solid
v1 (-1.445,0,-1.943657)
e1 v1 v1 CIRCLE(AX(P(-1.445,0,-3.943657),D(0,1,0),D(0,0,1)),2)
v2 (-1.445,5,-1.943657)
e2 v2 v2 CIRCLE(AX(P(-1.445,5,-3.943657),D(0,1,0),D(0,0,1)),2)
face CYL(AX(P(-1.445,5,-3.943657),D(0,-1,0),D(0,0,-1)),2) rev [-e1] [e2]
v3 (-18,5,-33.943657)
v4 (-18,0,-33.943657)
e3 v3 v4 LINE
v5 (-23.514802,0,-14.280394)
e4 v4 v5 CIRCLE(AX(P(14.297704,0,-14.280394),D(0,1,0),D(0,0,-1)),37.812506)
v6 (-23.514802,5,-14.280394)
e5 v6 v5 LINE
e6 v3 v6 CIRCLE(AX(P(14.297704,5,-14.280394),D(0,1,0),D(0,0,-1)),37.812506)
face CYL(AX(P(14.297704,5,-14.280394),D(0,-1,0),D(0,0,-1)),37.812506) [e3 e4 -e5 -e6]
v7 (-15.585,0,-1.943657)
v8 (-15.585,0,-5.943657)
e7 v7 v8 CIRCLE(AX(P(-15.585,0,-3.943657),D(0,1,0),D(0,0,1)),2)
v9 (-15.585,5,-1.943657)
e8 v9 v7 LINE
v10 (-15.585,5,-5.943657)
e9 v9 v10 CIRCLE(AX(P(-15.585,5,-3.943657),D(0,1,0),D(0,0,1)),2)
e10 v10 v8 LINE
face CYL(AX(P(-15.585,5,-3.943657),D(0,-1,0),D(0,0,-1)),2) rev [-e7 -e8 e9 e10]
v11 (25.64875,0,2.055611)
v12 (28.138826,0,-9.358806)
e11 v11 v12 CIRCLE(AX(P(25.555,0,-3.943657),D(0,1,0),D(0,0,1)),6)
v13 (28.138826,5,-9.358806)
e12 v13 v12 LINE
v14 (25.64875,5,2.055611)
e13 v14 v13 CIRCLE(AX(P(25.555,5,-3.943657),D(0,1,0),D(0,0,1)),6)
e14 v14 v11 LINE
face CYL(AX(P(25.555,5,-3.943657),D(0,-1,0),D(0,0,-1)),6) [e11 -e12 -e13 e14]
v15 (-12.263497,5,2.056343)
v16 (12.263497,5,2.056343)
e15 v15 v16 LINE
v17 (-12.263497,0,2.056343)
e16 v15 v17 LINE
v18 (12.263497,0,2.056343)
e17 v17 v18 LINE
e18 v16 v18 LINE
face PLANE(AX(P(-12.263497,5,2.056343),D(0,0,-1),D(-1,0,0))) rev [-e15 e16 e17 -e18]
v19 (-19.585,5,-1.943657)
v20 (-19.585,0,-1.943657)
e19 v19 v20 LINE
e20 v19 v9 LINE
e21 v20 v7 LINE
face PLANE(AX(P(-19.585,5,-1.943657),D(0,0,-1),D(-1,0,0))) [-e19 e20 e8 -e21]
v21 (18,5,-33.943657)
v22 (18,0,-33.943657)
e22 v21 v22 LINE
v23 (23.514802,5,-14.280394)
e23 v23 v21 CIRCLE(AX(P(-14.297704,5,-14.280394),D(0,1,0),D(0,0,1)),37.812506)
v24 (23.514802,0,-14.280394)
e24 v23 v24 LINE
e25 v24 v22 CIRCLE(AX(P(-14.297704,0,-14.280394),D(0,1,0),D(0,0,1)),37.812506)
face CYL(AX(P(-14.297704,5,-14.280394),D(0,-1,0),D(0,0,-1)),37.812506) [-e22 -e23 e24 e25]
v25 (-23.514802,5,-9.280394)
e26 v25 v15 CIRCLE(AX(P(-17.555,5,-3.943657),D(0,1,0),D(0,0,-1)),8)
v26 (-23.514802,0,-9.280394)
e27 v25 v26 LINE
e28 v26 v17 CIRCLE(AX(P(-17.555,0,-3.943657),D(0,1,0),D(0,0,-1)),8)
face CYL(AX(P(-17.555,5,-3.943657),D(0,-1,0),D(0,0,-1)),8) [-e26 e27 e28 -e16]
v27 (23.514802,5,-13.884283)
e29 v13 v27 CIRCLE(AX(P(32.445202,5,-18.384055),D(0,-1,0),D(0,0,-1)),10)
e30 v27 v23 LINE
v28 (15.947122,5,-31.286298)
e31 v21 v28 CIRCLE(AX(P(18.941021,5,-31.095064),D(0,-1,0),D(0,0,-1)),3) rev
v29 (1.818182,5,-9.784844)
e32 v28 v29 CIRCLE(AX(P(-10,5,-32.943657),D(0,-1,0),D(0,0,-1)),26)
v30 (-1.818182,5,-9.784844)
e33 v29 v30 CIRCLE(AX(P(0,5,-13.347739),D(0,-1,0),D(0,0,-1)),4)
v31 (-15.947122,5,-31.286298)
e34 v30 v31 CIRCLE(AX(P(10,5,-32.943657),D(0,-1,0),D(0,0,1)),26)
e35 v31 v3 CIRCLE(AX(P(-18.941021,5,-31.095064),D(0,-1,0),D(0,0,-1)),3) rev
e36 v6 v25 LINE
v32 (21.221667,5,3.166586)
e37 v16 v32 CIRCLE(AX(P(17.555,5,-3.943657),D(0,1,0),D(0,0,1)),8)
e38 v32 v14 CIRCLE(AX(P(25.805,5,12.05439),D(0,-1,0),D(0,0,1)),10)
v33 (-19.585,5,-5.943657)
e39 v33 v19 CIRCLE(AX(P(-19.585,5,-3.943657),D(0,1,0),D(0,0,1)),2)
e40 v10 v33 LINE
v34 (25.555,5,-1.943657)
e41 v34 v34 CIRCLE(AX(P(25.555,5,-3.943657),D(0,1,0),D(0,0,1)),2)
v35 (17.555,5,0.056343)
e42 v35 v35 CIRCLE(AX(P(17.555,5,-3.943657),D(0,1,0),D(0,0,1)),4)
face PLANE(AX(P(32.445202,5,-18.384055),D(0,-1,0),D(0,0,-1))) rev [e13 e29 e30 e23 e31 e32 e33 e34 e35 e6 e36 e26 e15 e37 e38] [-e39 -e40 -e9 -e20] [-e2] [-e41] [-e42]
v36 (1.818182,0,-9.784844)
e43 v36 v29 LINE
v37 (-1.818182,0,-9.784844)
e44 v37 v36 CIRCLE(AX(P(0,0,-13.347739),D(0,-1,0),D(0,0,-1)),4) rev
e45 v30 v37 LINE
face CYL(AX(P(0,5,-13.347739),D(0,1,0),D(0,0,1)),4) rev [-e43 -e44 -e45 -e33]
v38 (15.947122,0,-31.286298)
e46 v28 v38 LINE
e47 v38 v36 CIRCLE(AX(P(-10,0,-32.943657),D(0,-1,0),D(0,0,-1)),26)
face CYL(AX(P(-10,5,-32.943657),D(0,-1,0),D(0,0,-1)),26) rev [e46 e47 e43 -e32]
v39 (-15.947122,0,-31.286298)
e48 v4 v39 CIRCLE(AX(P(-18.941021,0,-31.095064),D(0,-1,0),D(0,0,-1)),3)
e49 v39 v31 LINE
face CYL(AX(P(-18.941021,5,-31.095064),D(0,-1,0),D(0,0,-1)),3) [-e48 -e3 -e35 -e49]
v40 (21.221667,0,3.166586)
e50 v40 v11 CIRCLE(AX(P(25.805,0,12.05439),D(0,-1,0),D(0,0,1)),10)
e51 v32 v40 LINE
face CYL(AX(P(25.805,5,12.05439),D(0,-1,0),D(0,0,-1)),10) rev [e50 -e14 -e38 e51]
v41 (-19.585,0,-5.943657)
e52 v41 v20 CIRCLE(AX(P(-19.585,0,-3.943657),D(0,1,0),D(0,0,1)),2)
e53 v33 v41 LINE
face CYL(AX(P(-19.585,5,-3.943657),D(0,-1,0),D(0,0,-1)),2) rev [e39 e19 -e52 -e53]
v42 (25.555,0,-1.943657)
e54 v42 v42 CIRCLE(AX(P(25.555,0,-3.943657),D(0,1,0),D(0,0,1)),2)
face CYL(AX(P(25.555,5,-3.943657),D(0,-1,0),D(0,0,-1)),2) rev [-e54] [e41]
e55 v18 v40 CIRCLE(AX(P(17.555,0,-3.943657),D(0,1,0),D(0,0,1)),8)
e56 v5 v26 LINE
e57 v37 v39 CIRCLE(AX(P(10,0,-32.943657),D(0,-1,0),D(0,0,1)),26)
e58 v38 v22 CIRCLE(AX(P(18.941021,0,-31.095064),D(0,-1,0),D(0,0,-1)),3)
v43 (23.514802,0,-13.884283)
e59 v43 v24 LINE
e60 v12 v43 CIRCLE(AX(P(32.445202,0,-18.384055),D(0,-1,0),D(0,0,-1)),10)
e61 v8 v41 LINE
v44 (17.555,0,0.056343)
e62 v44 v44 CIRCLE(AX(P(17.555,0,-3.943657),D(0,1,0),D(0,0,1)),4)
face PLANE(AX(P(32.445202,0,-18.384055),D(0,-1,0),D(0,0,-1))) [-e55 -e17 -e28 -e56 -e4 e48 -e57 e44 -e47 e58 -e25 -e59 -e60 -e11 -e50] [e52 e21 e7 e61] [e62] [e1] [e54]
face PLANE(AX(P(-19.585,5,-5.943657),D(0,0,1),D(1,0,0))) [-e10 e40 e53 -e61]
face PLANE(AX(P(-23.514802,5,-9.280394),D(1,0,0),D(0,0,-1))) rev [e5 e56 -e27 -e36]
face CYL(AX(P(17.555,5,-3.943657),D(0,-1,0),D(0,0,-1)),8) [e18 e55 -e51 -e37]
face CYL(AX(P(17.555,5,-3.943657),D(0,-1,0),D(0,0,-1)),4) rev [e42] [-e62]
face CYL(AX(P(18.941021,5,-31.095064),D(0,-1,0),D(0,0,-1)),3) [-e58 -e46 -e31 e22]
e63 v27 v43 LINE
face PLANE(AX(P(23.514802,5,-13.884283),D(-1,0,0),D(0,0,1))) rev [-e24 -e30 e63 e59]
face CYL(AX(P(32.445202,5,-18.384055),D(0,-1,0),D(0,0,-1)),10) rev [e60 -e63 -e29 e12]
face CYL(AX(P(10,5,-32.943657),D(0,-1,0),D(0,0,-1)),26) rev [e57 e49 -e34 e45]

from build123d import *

# Parameters (mm, degrees)
SKETCH1_R           = 4
SKETCH1_R_2         = 2
BOSS_EXTRUDE1_DEPTH = 5
FILLET1_R           = 4
FILLET2_R           = 3
FILLET3_R           = 3


with BuildPart() as part:
    # Sketch1 → Boss-Extrude1 (new body)
    with BuildSketch(Plane(origin=(0, 0, 0), x_dir=(1, 0, 0), z_dir=(0, 1, 0))):
        with BuildLine():
            Line((-16, 33.943656531), (-16, 32.943656531))
            ThreePointArc((-16, 32.943656531), (-11.633307653, 18.521451429), (0, 8.943656531))
            ThreePointArc((0, 8.943656531), (11.633307653, 18.521451429), (16, 32.943656531))
            Line((16, 32.943656531), (16, 33.943656531))
            Line((16, 33.943656531), (18, 33.943656531))
            ThreePointArc((18, 33.943656531), (22.110006153, 24.491379681), (23.514801823, 14.280393571))
            Line((23.514801823, 14.280393571), (23.514801823, 13.884283426))
            ThreePointArc((23.514801823, 13.884283426), (25.450700755, 11.237241369), (28.138825911, 9.35880599))
            ThreePointArc((28.138825911, 9.35880599), (31.417131183, 2.664821909), (25.64875, -2.055611002))
            ThreePointArc((25.64875, -2.055611002), (23.370974699, -2.355136602), (21.221666667, -3.166586471))
            ThreePointArc((21.221666667, -3.166586471), (16.57103717, -3.995601441), (12.263497378, -2.056343469))
            Line((12.263497378, -2.056343469), (-12.263497378, -2.056343469))
            ThreePointArc((-12.263497378, -2.056343469), (-23.233209016, -1.691762031), (-23.514801823, 9.280393571))
            Line((-23.514801823, 9.280393571), (-23.514801823, 14.280393571))
            ThreePointArc((-23.514801823, 14.280393571), (-22.110006153, 24.491379681), (-18, 33.943656531))
            Line((-18, 33.943656531), (-16, 33.943656531))
        make_face()
        with Locations(Location((17.555, 3.943656531, 0), (0, 0, 270))):
            Circle(SKETCH1_R, mode=Mode.SUBTRACT)
        with Locations(Location((25.555, 3.943656531, 0), (0, 0, 270))):
            Circle(SKETCH1_R_2, mode=Mode.SUBTRACT)
        with Locations(Location((-1.445, 3.943656531, 0), (0, 0, 270))):
            Circle(SKETCH1_R_2, mode=Mode.SUBTRACT)
        with BuildLine():
            Line((-19.585, 5.943656531), (-15.585, 5.943656531))
            ThreePointArc((-15.585, 5.943656531), (-13.585, 3.943656531), (-15.585, 1.943656531))
            Line((-15.585, 1.943656531), (-19.585, 1.943656531))
            ThreePointArc((-19.585, 1.943656531), (-21.585, 3.943656531), (-19.585, 5.943656531))
        make_face(mode=Mode.SUBTRACT)
    extrude(amount=BOSS_EXTRUDE1_DEPTH)

    # Fillet1
    fillet1_edges = [part.edges().sort_by_distance(p)[0] for p in [
        (0, 2.5, -8.943656531),
    ]]
    fillet(fillet1_edges, radius=FILLET1_R)

    # Fillet2
    # the kernel refuses this fillet: 3 mm, written as the material it takes off along each edge
    with BuildSketch(Plane(origin=(-16, -6.644712065, -33.943656531), x_dir=(0.019894609369720675, 0, 0.999802082673379), z_dir=(0, 1, 0))) as fillet2_piece_1:
        with BuildLine():
            CenterArc((2.789518237, -2.997110716), FILLET2_R, 92.514820362, 68.064461233)
            Line((-0.039789219, -1.999604165), (-0.322719964, -1.89985351))
            ThreePointArc((-0.322719964, -1.89985351), (-0.319835234, -0.9938337), (-0.299940625, 0.005968383))
            Line((-0.299940625, 0.005968383), (0.005968383, 0.299940625))
            ThreePointArc((0.005968383, 0.299940625), (1.005770465, 0.280046015), (2.644721485, 0.299711072))
            Line((2.644721485, 0.299711072), (2.657884826, 0))
        make_face()
    extrude(amount=18.289424129, mode=Mode.SUBTRACT)

    # Fillet3
    # the kernel refuses this fillet: 3 mm, written as the material it takes off along each edge
    with BuildSketch(Plane(origin=(16, -6.644712065, -33.943656531), x_dir=(1, 0, 0), z_dir=(0, 1, 0))) as fillet3_piece_1:
        with BuildLine():
            CenterArc((2.94102116, -2.84859249), FILLET3_R, 108.280766047, 68.064461233)
            Line((-0.05287758, -2.657358784), (-0.352267454, -2.638235414))
            ThreePointArc((-0.352267454, -2.638235414), (-0.3, -1), (-0.3, 0))
            Line((-0.3, 0), (0, 0.3))
            ThreePointArc((0, 0.3), (1, 0.3), (1.905897884, 0.284859249))
            Line((1.905897884, 0.284859249), (2, 0))
        make_face()
    extrude(amount=18.289424129, mode=Mode.SUBTRACT)


solid = part.part
